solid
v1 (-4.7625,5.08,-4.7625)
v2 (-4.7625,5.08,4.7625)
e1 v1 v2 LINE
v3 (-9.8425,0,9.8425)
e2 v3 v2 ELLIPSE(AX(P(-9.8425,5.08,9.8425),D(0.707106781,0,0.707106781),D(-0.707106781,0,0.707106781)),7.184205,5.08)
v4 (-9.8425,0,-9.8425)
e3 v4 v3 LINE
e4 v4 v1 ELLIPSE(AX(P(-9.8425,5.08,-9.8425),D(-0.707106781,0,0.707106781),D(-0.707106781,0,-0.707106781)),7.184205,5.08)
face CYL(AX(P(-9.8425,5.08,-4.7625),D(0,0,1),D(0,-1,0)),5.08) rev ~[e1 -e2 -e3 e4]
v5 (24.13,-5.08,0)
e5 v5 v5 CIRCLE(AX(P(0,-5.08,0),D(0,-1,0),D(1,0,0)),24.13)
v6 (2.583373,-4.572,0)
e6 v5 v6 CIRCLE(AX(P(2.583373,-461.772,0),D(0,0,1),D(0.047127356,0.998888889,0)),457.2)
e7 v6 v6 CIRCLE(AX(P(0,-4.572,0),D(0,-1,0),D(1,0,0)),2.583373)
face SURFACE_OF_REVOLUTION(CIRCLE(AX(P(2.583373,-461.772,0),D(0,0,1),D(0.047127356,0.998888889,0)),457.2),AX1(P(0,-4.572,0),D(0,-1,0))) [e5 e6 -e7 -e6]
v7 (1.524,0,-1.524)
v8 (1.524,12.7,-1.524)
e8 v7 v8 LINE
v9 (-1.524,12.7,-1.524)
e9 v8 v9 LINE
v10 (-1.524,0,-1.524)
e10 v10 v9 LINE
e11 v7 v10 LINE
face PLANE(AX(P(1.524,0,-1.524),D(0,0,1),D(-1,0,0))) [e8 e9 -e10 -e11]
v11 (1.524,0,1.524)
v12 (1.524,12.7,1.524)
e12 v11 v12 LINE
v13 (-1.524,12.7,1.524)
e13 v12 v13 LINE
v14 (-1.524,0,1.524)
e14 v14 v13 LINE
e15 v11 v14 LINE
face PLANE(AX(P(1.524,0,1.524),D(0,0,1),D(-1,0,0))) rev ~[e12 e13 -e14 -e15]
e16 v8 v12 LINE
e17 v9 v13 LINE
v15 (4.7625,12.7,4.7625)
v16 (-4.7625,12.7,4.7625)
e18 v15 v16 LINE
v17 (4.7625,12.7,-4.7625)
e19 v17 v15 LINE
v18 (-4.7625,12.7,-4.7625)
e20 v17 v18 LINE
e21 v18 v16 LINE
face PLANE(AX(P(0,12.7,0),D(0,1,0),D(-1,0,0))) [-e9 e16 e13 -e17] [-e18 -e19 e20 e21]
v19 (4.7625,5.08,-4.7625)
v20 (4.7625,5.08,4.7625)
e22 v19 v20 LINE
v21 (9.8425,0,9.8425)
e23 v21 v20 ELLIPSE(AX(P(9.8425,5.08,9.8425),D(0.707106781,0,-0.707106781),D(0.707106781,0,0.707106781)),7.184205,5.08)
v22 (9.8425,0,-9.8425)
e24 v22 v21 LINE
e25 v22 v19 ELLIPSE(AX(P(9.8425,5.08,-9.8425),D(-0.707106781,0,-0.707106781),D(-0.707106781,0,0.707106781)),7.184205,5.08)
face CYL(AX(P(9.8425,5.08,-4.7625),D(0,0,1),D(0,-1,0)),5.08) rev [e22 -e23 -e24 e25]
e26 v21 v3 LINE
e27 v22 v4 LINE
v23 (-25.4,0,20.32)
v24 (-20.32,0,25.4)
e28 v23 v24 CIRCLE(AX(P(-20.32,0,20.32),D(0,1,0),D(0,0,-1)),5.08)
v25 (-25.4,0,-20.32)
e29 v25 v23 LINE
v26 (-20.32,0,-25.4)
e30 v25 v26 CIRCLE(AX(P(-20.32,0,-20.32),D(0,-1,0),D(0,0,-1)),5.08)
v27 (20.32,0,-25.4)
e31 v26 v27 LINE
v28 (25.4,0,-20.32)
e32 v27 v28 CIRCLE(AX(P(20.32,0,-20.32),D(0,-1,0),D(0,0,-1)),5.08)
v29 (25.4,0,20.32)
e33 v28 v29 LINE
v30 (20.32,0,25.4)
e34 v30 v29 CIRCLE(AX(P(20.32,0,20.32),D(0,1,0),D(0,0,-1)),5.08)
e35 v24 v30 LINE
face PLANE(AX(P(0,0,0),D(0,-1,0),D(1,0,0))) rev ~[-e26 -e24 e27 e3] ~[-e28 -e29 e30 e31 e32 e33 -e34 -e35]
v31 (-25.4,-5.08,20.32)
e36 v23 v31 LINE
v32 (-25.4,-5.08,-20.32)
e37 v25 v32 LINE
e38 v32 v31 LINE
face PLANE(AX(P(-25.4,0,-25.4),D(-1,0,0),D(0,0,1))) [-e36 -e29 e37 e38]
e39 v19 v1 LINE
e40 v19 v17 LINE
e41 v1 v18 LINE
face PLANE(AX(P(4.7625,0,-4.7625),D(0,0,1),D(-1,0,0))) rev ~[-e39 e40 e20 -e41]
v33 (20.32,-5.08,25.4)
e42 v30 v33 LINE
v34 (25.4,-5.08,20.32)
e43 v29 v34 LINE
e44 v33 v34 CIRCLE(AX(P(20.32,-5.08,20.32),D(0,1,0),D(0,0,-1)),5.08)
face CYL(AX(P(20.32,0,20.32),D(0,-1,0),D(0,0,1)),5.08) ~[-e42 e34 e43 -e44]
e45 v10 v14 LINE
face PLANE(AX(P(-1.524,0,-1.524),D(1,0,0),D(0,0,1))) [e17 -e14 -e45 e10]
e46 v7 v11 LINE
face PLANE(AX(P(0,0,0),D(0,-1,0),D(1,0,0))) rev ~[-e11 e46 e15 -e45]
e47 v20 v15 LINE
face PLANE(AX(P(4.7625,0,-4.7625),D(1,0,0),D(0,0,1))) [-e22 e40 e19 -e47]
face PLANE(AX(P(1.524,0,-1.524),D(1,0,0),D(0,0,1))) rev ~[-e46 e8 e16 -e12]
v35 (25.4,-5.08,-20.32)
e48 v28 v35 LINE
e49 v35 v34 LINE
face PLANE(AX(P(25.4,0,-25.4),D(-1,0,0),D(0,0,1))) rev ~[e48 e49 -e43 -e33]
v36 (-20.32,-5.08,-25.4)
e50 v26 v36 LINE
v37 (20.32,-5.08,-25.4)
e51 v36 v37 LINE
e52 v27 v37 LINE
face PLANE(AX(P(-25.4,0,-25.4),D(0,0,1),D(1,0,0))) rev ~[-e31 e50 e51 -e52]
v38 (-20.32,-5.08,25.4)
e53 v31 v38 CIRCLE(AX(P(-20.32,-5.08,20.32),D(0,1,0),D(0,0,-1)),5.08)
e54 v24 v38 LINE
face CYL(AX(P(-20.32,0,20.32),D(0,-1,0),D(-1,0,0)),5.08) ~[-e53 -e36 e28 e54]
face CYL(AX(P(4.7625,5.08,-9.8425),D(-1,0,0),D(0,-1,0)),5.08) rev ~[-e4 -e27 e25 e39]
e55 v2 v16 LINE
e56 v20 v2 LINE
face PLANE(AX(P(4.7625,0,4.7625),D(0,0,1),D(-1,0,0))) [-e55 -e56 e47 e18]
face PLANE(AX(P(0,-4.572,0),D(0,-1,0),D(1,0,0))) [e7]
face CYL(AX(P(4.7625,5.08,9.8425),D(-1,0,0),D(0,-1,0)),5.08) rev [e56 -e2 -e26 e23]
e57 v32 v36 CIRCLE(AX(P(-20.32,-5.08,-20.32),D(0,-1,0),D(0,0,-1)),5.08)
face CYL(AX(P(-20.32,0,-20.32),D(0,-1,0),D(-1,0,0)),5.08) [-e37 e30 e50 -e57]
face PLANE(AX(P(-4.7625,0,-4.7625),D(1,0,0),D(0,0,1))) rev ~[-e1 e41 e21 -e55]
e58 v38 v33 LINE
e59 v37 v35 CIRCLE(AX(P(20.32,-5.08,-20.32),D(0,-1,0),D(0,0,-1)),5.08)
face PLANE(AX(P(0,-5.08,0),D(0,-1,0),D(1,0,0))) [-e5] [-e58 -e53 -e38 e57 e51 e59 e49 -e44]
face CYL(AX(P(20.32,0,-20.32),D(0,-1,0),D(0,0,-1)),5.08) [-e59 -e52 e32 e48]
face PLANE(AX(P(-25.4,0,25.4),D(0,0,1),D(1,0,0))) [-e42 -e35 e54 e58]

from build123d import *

# Parameters (mm, degrees)
F0_W     = 50.8
F0_H     = 50.8
F1_DEPTH = 5.08
F2_W     = 9.525
F2_H     = 9.525
F2_W_2   = 3.048
F2_H_2   = 3.048
F3_DEPTH = 12.7
F4_R     = 5.08
F5_R     = 5.08
F6_R     = 24.13
F7_DEPTH = 0.508


# Not quite as in the source:
# - a fillet or chamfer that OpenCascade refuses, or shapes differently, is made with other operations: its cross-section is extruded or revolved along the edge and cut away or added


with BuildPart() as f1:
    # F0 (on Front) → F1 (new body)
    with BuildSketch(Plane.XZ):
        Rectangle(F0_W, F0_H)
    extrude(amount=F1_DEPTH)

    # F2 (on face) → F3 (join)
    with BuildSketch(Plane(origin=(0, 0, 0), x_dir=(-1, 0, 0), z_dir=(0, 1, 0))):
        Rectangle(F2_W, F2_H)
        Rectangle(F2_W_2, F2_H_2, mode=Mode.SUBTRACT)
    extrude(amount=F3_DEPTH)

    # F4
    f4_edges = [f1.edges().sort_by_distance(p)[0] for p in [
        (0, 0, -4.7625),
        (-4.7625, 0, 0),
        (4.7625, 0, 0),
        (0, 0, 4.7625),
    ]]
    fillet(f4_edges, radius=F4_R)

    # F5
    f5_edges = [f1.edges().sort_by_distance(p)[0] for p in [
        (-25.4, -2.54, 25.4),
        (-25.4, -2.54, -25.4),
        (25.4, -2.54, 25.4),
        (25.4, -2.54, -25.4),
    ]]
    fillet(f5_edges, radius=F5_R)

    # F6 (on face) → F7 (cut)
    with BuildSketch(Plane.XZ.offset(5.08)):
        Circle(F6_R)
    extrude(amount=-F7_DEPTH, mode=Mode.SUBTRACT)

    # F8: fillet of radius 457.2 on 1 edges, made by hand

    # F8_s1 → F8_t2 (revolve)
    with BuildSketch(Plane.XY):
        with BuildLine():
            ThreePointArc((24.13, -5.08), (13.3596803239, -4.6990176438), (2.5833729786, -4.572))
            Line((2.5833729786, -4.572), (24.13, -4.572))
            Line((24.13, -4.572), (24.13, -5.08))
        make_face()
    revolve(axis=Axis((0, -4.572, 0), (0, -1, 0)))


solid = f1.part
